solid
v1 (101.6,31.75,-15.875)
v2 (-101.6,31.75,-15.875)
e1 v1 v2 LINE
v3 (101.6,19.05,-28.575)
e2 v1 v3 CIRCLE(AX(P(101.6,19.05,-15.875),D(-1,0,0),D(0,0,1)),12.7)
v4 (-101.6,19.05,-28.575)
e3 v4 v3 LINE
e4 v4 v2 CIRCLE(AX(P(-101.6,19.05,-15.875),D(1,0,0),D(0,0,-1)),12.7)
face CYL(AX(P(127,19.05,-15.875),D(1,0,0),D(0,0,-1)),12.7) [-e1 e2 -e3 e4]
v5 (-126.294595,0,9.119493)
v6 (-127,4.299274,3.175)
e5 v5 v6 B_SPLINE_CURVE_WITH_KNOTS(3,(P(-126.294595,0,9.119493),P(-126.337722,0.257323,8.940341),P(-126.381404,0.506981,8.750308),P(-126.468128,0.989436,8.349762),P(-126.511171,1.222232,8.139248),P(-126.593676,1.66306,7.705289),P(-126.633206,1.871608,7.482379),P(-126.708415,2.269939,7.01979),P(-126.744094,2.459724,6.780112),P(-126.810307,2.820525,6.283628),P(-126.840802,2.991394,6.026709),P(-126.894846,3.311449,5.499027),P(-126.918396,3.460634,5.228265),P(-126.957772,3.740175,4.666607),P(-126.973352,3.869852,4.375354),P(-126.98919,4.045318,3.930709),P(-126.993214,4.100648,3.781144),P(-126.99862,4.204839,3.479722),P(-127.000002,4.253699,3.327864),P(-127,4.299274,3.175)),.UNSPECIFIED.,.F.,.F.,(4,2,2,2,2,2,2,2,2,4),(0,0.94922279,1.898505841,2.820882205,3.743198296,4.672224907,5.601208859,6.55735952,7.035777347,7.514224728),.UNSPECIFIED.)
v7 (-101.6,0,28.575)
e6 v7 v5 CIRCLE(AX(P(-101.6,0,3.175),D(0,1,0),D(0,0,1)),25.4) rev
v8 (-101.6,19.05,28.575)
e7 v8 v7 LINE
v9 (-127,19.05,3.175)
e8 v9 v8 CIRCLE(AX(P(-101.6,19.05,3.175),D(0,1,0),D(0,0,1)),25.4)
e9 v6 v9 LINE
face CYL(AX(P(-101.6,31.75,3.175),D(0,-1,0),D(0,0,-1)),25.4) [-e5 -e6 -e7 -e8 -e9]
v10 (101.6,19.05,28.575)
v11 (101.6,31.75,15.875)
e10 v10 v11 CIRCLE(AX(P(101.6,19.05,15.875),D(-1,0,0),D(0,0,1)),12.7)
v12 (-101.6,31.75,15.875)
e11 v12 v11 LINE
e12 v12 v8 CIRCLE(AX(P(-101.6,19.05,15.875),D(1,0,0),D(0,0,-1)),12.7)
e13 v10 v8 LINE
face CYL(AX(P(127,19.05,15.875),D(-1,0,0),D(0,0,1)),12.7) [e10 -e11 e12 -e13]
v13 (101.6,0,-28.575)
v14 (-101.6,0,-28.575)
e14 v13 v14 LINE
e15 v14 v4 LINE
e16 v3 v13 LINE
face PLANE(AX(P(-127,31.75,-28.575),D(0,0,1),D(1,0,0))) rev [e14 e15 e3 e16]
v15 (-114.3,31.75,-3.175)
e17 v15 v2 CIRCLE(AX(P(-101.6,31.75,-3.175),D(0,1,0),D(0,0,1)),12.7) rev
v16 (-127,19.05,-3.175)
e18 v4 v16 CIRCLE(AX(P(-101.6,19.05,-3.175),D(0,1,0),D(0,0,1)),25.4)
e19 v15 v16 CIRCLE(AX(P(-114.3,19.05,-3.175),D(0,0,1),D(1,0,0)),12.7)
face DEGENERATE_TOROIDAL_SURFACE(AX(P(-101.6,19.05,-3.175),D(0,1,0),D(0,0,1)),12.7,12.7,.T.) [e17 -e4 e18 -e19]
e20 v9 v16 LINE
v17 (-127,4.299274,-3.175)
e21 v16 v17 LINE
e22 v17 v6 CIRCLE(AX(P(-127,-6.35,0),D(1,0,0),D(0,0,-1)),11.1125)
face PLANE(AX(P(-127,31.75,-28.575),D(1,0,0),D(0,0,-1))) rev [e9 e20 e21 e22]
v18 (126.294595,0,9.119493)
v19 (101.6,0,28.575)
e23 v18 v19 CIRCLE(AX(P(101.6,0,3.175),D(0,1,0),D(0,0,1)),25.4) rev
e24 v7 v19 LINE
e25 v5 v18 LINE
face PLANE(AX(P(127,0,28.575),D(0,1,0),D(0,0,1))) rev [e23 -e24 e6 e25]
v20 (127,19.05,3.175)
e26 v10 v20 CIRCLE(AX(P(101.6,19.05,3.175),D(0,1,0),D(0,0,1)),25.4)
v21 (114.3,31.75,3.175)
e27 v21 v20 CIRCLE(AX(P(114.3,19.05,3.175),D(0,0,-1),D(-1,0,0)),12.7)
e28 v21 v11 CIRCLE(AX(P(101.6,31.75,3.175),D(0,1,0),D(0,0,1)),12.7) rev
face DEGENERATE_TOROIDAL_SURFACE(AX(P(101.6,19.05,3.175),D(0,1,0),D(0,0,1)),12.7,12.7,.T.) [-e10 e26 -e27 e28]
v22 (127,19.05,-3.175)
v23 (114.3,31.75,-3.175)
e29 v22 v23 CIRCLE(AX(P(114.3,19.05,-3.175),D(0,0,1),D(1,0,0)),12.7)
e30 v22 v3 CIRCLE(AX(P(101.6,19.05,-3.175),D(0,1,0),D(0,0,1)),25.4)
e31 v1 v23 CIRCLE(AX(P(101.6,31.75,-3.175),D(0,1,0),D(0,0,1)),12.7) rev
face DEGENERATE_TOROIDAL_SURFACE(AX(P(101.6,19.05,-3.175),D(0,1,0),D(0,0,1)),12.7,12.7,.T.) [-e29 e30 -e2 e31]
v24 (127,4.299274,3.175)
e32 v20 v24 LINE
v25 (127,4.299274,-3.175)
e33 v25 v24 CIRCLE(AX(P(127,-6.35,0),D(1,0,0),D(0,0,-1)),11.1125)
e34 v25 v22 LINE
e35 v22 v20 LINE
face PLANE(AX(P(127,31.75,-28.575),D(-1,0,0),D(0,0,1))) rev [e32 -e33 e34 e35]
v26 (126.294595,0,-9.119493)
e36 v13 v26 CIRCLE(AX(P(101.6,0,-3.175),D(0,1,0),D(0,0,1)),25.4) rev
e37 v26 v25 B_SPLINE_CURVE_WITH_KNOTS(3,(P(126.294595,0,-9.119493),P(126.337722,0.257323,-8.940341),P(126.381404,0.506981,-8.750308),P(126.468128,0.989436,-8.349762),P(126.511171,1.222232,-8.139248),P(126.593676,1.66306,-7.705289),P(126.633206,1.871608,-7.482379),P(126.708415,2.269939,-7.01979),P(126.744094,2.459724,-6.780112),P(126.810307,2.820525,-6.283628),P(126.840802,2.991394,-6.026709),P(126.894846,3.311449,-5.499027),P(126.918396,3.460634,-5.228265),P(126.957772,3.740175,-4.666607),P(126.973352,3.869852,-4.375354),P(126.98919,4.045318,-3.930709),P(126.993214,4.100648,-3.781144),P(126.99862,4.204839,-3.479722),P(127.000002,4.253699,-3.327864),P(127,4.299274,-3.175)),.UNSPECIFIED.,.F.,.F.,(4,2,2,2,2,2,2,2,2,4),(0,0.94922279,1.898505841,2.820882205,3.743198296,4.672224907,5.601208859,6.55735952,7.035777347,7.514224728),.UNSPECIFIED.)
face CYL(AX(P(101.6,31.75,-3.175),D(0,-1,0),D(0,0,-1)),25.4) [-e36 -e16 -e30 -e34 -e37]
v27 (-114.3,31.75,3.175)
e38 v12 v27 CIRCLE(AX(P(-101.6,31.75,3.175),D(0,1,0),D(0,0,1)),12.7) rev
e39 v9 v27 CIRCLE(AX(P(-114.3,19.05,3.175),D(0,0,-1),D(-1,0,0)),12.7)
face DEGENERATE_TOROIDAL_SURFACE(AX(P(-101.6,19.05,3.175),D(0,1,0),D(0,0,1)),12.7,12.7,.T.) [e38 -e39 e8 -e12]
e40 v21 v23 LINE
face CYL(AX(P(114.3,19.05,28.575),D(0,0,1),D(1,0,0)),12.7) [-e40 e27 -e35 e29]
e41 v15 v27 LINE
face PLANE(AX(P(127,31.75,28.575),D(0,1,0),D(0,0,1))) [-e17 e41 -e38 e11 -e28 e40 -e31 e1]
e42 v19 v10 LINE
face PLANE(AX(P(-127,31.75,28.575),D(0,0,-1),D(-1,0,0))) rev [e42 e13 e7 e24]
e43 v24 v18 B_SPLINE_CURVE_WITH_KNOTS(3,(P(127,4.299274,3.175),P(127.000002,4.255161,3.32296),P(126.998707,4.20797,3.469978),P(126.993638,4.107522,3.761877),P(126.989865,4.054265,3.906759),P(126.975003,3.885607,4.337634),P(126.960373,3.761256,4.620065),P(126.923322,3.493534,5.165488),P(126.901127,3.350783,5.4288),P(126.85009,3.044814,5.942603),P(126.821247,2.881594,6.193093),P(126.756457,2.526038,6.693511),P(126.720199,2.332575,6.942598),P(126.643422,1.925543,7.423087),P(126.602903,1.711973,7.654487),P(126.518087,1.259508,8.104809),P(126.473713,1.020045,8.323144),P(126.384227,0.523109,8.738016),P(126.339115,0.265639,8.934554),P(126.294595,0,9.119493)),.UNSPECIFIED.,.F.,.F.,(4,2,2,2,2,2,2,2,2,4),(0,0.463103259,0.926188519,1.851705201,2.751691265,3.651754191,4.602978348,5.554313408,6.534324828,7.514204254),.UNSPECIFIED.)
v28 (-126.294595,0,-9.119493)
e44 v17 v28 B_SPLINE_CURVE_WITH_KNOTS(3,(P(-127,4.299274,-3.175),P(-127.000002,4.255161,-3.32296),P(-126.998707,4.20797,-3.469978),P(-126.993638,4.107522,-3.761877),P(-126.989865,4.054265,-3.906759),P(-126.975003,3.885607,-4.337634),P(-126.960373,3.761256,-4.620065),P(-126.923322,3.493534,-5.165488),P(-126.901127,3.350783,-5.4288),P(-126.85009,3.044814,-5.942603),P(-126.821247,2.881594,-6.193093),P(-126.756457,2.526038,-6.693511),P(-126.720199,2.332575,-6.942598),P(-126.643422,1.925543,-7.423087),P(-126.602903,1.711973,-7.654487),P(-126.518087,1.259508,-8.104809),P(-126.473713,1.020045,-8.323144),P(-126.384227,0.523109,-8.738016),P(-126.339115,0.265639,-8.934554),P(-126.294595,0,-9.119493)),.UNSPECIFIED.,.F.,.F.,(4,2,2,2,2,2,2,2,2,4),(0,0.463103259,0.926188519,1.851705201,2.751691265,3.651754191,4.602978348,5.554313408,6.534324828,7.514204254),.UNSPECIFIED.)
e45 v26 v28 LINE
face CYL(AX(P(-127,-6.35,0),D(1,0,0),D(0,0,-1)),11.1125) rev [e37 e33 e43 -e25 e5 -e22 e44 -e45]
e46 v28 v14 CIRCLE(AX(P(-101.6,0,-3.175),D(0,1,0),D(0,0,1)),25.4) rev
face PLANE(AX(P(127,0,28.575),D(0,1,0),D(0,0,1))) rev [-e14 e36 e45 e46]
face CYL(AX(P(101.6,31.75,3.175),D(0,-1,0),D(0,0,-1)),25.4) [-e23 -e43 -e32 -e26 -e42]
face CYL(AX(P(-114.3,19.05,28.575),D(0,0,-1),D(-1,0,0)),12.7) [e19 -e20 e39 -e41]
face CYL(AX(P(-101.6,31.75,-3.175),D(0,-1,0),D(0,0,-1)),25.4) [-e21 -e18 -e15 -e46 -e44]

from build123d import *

# Parameters (mm, degrees)
SKETCH1_W               = 254
SKETCH1_H               = 57.15
BOSS_EXTRUDE1_DEPTH     = 31.75
FILLET1_R               = 12.7
FILLET2_R               = 25.4
CUT_EXTRUDE1_DEPTH      = 134.991018822
CUT_EXTRUDE1_DEPTH_BACK = 134.991018822
SKETCH2_R               = 11.1125


with BuildPart() as part:
    # Sketch1 → Boss-Extrude1 (new body)
    with BuildSketch(Plane(origin=(0, 0, 0), x_dir=(1, 0, 0), z_dir=(0, 1, 0))):
        Rectangle(SKETCH1_W, SKETCH1_H)
    extrude(amount=BOSS_EXTRUDE1_DEPTH)

    # Fillet1
    fillet1_edges = [part.edges().sort_by_distance(p)[0] for p in [
        (-127, 31.75, 0),
        (0, 31.75, 28.575),
        (127, 31.75, 0),
        (0, 31.75, -28.575),
    ]]
    fillet(fillet1_edges, radius=FILLET1_R)

    # Fillet2
    # the kernel refuses this fillet: 25.4 mm, written as the material it takes off along each edge
    with BuildSketch(Plane(origin=(101.6, 31.75, -3.175), x_dir=(1, 0, 0), z_dir=(0, 0, 1))) as fillet2_piece_1:
        with BuildLine():
            CenterArc((12.7, -12.7), 12.7, 0, 90)
            Line((25.4, -12.7), (25.4, 0))
            Line((25.4, 0), (12.7, 0))
        make_face()
    revolve(axis=Axis((101.6, 31.75, -3.175), (0, 1, 0)), revolution_arc=90, mode=Mode.SUBTRACT)
    with BuildSketch(Plane(origin=(101.6, 31.75, 3.175), x_dir=(0, 0, 1), z_dir=(-1, 0, 0))) as fillet2_piece_2:
        with BuildLine():
            CenterArc((12.7, -12.7), 12.7, 0, 90)
            Line((25.4, -12.7), (25.4, 0))
            Line((25.4, 0), (12.7, 0))
        make_face()
    revolve(axis=Axis((101.6, 31.75, 3.175), (0, 1, 0)), revolution_arc=90, mode=Mode.SUBTRACT)
    with BuildSketch(Plane(origin=(-101.6, 31.75, -3.175), x_dir=(0, 0, -1), z_dir=(1, 0, 0))) as fillet2_piece_3:
        with BuildLine():
            CenterArc((12.7, -12.7), 12.7, 0, 90)
            Line((25.4, -12.7), (25.4, 0))
            Line((25.4, 0), (12.7, 0))
        make_face()
    revolve(axis=Axis((-101.6, 31.75, -3.175), (0, 1, 0)), revolution_arc=90, mode=Mode.SUBTRACT)
    with BuildSketch(Plane(origin=(-101.6, 31.75, 3.175), x_dir=(-1, 0, 0), z_dir=(0, 0, -1))) as fillet2_piece_4:
        with BuildLine():
            CenterArc((12.7, -12.7), 12.7, 0, 90)
            Line((25.4, -12.7), (25.4, 0))
            Line((25.4, 0), (12.7, 0))
        make_face()
    revolve(axis=Axis((-101.6, 31.75, 3.175), (0, 1, 0)), revolution_arc=90, mode=Mode.SUBTRACT)
    with BuildSketch(Plane(origin=(-127, -63.5, 28.575), x_dir=(0, 0, -1), z_dir=(0, 1, 0)), Plane(origin=(-127, -63.5, -28.575), x_dir=(1, 0, 0), z_dir=(0, 1, 0))) as fillet2_piece_5:
        with BuildLine():
            CenterArc((FILLET2_R, -FILLET2_R), FILLET2_R, 90, 90)
            Line((0, -FILLET2_R), (0, 0))
            Line((0, 0), (FILLET2_R, 0))
        make_face()
    extrude(amount=95.25, mode=Mode.SUBTRACT)
    with BuildSketch(Plane(origin=(127, -63.5, -28.575), x_dir=(-1, 0, 0), z_dir=(0, 1, 0)), Plane(origin=(127, -63.5, 28.575), x_dir=(0, 0, -1), z_dir=(0, 1, 0))) as fillet2_piece_6:
        with BuildLine():
            CenterArc((FILLET2_R, FILLET2_R), FILLET2_R, 180, 90)
            Line((0, FILLET2_R), (0, 0))
            Line((0, 0), (FILLET2_R, 0))
        make_face()
    extrude(amount=95.25, mode=Mode.SUBTRACT)

    # Sketch2 → Cut-Extrude1 (cut, two sides: drawn at the far end of the back side and taken through both)
    with BuildSketch(Plane(origin=(0, 0, 0), x_dir=(0, 0, -1), z_dir=(1, 0, 0)).offset(-CUT_EXTRUDE1_DEPTH_BACK)):
        with Locations((0, -6.35)):
            Circle(SKETCH2_R)
    extrude(amount=CUT_EXTRUDE1_DEPTH + CUT_EXTRUDE1_DEPTH_BACK, mode=Mode.SUBTRACT)


solid = part.part
